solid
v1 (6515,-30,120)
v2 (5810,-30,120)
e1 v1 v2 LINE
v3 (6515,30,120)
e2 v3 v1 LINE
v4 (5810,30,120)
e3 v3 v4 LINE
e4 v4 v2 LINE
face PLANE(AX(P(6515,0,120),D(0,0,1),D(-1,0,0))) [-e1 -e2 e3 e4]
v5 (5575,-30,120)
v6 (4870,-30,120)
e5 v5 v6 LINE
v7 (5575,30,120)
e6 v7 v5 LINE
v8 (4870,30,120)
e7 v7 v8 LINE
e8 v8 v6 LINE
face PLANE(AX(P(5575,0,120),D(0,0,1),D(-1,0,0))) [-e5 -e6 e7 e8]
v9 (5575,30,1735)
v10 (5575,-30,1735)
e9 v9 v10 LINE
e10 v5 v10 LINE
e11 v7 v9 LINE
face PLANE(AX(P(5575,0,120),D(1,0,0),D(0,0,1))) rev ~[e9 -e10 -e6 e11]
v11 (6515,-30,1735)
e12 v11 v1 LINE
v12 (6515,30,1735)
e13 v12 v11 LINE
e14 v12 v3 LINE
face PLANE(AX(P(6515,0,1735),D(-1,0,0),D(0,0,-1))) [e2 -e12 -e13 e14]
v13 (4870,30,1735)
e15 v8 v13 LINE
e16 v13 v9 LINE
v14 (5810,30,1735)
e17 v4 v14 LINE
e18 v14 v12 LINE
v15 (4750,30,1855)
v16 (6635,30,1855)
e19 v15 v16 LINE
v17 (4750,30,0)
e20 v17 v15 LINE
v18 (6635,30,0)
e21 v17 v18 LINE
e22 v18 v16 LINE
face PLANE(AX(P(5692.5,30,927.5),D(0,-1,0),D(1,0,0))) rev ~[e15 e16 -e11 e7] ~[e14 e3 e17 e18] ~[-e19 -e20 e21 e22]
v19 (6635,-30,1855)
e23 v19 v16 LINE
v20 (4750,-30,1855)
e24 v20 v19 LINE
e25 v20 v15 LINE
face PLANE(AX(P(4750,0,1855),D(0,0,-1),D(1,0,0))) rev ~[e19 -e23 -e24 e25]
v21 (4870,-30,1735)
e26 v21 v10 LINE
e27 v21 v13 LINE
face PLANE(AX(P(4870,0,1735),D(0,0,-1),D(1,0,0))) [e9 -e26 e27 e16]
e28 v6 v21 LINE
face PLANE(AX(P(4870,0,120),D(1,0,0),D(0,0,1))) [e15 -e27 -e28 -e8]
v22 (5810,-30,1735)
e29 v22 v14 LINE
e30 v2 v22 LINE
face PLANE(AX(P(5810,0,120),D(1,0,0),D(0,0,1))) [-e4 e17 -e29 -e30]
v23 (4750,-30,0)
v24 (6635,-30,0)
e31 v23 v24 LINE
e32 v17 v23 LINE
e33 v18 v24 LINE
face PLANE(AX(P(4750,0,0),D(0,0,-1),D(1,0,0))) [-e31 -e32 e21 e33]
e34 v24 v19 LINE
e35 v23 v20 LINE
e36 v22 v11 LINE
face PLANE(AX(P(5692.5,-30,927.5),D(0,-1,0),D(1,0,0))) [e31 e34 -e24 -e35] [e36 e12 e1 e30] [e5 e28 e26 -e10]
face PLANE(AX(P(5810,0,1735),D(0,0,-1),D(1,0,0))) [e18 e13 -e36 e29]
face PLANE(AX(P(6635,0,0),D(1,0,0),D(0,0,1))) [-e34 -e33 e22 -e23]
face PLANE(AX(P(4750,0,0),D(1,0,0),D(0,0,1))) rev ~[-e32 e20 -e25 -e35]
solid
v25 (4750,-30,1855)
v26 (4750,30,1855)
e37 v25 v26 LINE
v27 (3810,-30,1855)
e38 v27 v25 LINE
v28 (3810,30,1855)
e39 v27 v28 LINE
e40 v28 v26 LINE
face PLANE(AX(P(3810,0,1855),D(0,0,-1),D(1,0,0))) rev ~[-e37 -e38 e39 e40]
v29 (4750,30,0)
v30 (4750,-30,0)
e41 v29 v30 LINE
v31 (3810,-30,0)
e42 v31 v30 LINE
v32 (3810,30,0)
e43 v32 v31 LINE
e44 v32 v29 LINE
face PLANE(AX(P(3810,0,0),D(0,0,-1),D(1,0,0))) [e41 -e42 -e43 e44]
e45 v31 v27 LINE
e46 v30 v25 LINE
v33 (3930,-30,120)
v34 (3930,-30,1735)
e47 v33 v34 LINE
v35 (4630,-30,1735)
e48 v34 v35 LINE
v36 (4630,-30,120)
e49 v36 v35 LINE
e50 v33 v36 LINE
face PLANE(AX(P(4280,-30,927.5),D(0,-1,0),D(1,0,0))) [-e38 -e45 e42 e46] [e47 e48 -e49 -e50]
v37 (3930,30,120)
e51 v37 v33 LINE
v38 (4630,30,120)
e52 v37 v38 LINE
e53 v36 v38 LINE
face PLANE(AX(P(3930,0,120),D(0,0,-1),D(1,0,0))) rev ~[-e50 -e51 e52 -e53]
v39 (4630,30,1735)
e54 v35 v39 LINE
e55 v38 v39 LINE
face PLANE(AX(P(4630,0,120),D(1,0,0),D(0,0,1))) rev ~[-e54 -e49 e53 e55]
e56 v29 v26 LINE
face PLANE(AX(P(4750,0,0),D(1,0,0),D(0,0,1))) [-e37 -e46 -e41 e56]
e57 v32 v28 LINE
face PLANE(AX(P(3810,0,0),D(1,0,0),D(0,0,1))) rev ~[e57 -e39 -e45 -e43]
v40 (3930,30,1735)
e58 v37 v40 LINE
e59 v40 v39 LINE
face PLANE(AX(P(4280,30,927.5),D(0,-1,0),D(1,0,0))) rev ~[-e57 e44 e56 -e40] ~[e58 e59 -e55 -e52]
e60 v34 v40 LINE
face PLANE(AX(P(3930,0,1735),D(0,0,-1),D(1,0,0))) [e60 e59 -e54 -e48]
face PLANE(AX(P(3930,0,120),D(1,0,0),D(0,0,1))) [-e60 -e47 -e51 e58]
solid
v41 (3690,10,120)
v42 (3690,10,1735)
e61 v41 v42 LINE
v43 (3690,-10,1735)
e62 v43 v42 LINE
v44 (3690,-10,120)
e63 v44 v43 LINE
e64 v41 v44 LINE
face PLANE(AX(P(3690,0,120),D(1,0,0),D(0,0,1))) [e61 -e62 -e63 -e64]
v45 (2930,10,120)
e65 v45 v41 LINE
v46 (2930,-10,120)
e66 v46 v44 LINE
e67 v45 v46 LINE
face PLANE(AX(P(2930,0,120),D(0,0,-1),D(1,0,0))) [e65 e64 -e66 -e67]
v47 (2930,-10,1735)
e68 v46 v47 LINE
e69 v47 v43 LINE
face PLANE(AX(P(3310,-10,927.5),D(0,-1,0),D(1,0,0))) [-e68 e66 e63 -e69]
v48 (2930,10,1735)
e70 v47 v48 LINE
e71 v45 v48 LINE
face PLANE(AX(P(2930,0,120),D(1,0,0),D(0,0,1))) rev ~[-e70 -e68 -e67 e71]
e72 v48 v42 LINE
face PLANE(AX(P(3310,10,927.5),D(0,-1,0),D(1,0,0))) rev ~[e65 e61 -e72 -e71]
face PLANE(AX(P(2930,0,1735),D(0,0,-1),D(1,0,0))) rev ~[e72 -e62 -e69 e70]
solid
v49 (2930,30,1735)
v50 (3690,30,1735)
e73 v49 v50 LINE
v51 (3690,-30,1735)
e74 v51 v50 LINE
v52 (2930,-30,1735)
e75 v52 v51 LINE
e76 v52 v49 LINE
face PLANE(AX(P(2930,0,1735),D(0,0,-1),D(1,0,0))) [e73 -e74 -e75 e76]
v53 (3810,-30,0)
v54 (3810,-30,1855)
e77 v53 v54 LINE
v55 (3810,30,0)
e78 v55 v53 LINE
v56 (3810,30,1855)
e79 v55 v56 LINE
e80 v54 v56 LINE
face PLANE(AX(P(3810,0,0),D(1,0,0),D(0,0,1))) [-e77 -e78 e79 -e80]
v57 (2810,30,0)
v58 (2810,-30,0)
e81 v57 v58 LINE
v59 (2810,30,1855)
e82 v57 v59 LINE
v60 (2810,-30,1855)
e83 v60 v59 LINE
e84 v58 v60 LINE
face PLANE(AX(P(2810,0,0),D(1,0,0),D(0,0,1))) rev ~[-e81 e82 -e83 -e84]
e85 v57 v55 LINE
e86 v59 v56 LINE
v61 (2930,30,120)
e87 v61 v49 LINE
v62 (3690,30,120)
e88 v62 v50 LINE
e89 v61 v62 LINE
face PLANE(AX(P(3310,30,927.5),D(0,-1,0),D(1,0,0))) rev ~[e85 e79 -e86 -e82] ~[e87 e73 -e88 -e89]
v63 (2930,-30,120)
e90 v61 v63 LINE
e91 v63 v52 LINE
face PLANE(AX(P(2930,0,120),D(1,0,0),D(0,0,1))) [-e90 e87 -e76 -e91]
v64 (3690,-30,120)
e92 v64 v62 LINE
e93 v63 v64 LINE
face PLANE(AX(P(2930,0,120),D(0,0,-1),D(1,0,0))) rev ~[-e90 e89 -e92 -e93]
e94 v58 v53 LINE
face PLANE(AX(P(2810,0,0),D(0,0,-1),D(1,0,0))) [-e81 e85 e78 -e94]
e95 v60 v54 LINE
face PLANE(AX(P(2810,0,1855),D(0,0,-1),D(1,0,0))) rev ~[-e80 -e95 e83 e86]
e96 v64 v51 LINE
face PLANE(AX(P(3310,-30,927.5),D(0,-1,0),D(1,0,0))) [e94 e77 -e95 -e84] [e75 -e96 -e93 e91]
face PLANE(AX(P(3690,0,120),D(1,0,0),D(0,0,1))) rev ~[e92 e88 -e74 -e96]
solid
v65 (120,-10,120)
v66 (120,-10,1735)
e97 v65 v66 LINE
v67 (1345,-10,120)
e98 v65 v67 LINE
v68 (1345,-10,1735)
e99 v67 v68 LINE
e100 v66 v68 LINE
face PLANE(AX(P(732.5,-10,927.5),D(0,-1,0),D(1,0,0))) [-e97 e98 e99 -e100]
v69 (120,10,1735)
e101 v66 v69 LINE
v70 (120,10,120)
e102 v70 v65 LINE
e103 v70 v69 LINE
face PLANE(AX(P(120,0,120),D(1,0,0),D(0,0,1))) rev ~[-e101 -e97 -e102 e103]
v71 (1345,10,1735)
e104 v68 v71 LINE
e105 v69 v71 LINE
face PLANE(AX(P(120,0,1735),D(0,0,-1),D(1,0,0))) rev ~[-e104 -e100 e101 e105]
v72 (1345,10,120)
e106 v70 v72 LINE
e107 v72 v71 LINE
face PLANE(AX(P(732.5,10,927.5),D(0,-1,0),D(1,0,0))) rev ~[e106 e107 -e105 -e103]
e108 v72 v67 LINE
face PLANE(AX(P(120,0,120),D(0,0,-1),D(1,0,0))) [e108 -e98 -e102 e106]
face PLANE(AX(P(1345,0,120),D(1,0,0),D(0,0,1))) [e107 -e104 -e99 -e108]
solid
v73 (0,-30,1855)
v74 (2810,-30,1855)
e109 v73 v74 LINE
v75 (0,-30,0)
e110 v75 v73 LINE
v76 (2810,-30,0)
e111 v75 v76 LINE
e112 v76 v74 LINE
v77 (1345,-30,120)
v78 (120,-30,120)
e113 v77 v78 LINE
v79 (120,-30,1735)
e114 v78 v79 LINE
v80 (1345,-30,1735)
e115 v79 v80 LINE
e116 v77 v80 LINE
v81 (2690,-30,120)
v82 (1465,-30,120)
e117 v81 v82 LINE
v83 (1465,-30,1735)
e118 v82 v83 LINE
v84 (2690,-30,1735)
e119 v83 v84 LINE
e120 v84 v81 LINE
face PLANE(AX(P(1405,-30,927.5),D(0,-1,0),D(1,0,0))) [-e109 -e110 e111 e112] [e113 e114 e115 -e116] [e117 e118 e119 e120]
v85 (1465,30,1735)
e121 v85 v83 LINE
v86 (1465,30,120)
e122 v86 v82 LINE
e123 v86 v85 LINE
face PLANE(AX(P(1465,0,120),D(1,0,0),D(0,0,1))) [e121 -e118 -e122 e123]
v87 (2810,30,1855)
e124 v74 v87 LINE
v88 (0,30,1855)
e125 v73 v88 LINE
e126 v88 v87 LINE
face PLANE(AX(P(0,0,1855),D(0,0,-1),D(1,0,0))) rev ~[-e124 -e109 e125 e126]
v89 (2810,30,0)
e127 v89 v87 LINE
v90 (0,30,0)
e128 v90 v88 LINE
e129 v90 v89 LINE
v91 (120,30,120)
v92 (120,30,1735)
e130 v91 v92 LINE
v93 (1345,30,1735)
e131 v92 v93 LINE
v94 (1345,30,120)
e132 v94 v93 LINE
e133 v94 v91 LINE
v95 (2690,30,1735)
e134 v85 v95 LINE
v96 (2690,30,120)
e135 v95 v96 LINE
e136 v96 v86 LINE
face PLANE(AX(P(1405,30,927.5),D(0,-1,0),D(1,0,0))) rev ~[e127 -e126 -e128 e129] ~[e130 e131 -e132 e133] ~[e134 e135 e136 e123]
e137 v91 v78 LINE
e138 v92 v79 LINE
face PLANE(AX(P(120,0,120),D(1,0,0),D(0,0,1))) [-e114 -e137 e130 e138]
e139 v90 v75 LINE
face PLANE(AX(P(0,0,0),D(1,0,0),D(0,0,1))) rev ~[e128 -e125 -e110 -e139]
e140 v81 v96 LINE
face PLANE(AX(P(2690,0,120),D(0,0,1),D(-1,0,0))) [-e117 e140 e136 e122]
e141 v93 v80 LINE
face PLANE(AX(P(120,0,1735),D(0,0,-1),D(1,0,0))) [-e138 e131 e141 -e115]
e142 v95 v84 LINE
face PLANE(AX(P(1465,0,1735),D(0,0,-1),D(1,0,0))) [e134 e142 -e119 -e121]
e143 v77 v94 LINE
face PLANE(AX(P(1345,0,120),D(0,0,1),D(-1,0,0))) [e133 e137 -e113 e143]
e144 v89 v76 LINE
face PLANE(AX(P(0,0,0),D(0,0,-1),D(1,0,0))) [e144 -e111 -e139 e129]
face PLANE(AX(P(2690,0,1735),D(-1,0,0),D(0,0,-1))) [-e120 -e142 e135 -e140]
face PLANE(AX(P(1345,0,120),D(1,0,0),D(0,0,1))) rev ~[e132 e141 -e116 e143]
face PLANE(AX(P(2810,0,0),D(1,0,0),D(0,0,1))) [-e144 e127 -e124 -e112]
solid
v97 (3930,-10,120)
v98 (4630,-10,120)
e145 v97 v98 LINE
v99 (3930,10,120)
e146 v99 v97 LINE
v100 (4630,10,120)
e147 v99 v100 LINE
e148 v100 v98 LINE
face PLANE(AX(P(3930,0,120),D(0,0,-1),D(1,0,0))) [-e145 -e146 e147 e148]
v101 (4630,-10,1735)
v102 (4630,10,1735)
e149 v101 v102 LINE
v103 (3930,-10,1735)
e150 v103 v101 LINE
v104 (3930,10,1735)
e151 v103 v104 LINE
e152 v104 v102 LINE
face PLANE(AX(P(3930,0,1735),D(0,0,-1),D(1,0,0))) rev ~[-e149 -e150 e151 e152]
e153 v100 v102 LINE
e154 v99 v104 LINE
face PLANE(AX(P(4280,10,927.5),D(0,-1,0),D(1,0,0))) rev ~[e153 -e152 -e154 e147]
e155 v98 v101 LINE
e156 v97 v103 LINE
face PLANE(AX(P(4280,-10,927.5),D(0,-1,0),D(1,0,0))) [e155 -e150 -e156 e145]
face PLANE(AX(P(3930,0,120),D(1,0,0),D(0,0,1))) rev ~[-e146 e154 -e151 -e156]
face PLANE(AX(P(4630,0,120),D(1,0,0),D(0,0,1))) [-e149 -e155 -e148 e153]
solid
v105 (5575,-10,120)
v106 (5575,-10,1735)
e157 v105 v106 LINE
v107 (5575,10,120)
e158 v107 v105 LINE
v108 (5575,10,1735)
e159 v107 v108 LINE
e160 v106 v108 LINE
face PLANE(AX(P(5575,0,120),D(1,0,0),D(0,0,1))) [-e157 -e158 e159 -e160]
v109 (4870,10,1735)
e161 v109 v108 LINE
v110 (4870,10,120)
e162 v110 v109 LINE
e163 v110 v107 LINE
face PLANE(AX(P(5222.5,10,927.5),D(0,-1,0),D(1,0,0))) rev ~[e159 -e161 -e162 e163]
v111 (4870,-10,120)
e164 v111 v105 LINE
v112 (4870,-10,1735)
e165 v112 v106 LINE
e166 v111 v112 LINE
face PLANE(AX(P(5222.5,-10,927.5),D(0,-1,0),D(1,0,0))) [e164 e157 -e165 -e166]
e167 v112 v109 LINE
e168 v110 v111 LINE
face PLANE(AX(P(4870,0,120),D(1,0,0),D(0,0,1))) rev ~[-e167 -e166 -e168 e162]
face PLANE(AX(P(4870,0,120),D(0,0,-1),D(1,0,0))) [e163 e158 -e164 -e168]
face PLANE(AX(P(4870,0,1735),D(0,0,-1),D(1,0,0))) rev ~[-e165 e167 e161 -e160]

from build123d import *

# Parameters (mm, degrees)
F0_W     = 2810
F0_H     = 1855
F0_W_2   = 120
F0_H_2   = 1615
F1_DEPTH = 30
F0_W_3   = 1225
F2_DEPTH = 10
F0_W_4   = 1000
F0_W_5   = 760
F3_DEPTH = 30
F4_DEPTH = 10
F0_W_6   = 940
F0_W_7   = 700
F5_DEPTH = 30
F6_DEPTH = 10
F0_W_8   = 1885
F0_W_9   = 117.5
F7_DEPTH = 30
F0_W_10  = 705
F8_DEPTH = 10


with BuildPart() as f1:
    # F0 (on Front) → F1 (new body, symmetric)
    with BuildSketch(Plane.XZ):
        with Locations((1405, 927.5)):
            Rectangle(F0_W, F0_H)
        Polygon((120, 120), (120, 1735), (1345, 1735), (1465, 1735), (2690, 1735), (2690, 120), (1465, 120), (1345, 120), align=None, mode=Mode.SUBTRACT)
        with Locations((1405, 927.5)):
            Rectangle(F0_W_2, F0_H_2)
    extrude(amount=F1_DEPTH, both=True)


with BuildPart() as f2:
    # F0 (on Front) → F2 (new body, symmetric)
    with BuildSketch(Plane.XZ):
        with Locations((732.5, 927.5)):
            Rectangle(F0_W_3, F0_H_2)
    extrude(amount=F2_DEPTH, both=True)


with BuildPart() as f3:
    # F0 (on Front) → F3 (new body, symmetric)
    with BuildSketch(Plane.XZ):
        with Locations((3310, 927.5)):
            Rectangle(F0_W_4, F0_H)
        with Locations((3310, 927.5)):
            Rectangle(F0_W_5, F0_H_2, mode=Mode.SUBTRACT)
    extrude(amount=F3_DEPTH, both=True)


with BuildPart() as f4:
    # F0 (on Front) → F4 (new body, symmetric)
    with BuildSketch(Plane.XZ):
        with Locations((3310, 927.5)):
            Rectangle(F0_W_5, F0_H_2)
    extrude(amount=F4_DEPTH, both=True)


with BuildPart() as f5:
    # F0 (on Front) → F5 (new body, symmetric)
    with BuildSketch(Plane.XZ):
        with Locations((4280, 927.5)):
            Rectangle(F0_W_6, F0_H)
        with Locations((4280, 927.5)):
            Rectangle(F0_W_7, F0_H_2, mode=Mode.SUBTRACT)
    extrude(amount=F5_DEPTH, both=True)


with BuildPart() as f6:
    # F0 (on Front) → F6 (new body, symmetric)
    with BuildSketch(Plane.XZ):
        with Locations((4280, 927.5)):
            Rectangle(F0_W_7, F0_H_2)
    extrude(amount=F6_DEPTH, both=True)


with BuildPart() as f7:
    # F0 (on Front) → F7 (new body, symmetric)
    with BuildSketch(Plane.XZ):
        with Locations((5692.5, 927.5)):
            Rectangle(F0_W_8, F0_H)
        Polygon((5810, 1735), (6515, 1735), (6515, 120), (5810, 120), (5692.5, 120), (5575, 120), (4870, 120), (4870, 1735), (5575, 1735), (5692.5, 1735), align=None, mode=Mode.SUBTRACT)
        with Locations((5633.75, 927.5)):
            Rectangle(F0_W_9, F0_H_2)
        with Locations((5751.25, 927.5)):
            Rectangle(F0_W_9, F0_H_2)
    extrude(amount=F7_DEPTH, both=True)


with BuildPart() as f8:
    # F0 (on Front) → F8 (new body, symmetric)
    with BuildSketch(Plane.XZ):
        with Locations((5222.5, 927.5)):
            Rectangle(F0_W_10, F0_H_2)
    extrude(amount=F8_DEPTH, both=True)


solid = Compound([f1.part, f2.part, f3.part, f4.part, f5.part, f6.part, f7.part, f8.part])
